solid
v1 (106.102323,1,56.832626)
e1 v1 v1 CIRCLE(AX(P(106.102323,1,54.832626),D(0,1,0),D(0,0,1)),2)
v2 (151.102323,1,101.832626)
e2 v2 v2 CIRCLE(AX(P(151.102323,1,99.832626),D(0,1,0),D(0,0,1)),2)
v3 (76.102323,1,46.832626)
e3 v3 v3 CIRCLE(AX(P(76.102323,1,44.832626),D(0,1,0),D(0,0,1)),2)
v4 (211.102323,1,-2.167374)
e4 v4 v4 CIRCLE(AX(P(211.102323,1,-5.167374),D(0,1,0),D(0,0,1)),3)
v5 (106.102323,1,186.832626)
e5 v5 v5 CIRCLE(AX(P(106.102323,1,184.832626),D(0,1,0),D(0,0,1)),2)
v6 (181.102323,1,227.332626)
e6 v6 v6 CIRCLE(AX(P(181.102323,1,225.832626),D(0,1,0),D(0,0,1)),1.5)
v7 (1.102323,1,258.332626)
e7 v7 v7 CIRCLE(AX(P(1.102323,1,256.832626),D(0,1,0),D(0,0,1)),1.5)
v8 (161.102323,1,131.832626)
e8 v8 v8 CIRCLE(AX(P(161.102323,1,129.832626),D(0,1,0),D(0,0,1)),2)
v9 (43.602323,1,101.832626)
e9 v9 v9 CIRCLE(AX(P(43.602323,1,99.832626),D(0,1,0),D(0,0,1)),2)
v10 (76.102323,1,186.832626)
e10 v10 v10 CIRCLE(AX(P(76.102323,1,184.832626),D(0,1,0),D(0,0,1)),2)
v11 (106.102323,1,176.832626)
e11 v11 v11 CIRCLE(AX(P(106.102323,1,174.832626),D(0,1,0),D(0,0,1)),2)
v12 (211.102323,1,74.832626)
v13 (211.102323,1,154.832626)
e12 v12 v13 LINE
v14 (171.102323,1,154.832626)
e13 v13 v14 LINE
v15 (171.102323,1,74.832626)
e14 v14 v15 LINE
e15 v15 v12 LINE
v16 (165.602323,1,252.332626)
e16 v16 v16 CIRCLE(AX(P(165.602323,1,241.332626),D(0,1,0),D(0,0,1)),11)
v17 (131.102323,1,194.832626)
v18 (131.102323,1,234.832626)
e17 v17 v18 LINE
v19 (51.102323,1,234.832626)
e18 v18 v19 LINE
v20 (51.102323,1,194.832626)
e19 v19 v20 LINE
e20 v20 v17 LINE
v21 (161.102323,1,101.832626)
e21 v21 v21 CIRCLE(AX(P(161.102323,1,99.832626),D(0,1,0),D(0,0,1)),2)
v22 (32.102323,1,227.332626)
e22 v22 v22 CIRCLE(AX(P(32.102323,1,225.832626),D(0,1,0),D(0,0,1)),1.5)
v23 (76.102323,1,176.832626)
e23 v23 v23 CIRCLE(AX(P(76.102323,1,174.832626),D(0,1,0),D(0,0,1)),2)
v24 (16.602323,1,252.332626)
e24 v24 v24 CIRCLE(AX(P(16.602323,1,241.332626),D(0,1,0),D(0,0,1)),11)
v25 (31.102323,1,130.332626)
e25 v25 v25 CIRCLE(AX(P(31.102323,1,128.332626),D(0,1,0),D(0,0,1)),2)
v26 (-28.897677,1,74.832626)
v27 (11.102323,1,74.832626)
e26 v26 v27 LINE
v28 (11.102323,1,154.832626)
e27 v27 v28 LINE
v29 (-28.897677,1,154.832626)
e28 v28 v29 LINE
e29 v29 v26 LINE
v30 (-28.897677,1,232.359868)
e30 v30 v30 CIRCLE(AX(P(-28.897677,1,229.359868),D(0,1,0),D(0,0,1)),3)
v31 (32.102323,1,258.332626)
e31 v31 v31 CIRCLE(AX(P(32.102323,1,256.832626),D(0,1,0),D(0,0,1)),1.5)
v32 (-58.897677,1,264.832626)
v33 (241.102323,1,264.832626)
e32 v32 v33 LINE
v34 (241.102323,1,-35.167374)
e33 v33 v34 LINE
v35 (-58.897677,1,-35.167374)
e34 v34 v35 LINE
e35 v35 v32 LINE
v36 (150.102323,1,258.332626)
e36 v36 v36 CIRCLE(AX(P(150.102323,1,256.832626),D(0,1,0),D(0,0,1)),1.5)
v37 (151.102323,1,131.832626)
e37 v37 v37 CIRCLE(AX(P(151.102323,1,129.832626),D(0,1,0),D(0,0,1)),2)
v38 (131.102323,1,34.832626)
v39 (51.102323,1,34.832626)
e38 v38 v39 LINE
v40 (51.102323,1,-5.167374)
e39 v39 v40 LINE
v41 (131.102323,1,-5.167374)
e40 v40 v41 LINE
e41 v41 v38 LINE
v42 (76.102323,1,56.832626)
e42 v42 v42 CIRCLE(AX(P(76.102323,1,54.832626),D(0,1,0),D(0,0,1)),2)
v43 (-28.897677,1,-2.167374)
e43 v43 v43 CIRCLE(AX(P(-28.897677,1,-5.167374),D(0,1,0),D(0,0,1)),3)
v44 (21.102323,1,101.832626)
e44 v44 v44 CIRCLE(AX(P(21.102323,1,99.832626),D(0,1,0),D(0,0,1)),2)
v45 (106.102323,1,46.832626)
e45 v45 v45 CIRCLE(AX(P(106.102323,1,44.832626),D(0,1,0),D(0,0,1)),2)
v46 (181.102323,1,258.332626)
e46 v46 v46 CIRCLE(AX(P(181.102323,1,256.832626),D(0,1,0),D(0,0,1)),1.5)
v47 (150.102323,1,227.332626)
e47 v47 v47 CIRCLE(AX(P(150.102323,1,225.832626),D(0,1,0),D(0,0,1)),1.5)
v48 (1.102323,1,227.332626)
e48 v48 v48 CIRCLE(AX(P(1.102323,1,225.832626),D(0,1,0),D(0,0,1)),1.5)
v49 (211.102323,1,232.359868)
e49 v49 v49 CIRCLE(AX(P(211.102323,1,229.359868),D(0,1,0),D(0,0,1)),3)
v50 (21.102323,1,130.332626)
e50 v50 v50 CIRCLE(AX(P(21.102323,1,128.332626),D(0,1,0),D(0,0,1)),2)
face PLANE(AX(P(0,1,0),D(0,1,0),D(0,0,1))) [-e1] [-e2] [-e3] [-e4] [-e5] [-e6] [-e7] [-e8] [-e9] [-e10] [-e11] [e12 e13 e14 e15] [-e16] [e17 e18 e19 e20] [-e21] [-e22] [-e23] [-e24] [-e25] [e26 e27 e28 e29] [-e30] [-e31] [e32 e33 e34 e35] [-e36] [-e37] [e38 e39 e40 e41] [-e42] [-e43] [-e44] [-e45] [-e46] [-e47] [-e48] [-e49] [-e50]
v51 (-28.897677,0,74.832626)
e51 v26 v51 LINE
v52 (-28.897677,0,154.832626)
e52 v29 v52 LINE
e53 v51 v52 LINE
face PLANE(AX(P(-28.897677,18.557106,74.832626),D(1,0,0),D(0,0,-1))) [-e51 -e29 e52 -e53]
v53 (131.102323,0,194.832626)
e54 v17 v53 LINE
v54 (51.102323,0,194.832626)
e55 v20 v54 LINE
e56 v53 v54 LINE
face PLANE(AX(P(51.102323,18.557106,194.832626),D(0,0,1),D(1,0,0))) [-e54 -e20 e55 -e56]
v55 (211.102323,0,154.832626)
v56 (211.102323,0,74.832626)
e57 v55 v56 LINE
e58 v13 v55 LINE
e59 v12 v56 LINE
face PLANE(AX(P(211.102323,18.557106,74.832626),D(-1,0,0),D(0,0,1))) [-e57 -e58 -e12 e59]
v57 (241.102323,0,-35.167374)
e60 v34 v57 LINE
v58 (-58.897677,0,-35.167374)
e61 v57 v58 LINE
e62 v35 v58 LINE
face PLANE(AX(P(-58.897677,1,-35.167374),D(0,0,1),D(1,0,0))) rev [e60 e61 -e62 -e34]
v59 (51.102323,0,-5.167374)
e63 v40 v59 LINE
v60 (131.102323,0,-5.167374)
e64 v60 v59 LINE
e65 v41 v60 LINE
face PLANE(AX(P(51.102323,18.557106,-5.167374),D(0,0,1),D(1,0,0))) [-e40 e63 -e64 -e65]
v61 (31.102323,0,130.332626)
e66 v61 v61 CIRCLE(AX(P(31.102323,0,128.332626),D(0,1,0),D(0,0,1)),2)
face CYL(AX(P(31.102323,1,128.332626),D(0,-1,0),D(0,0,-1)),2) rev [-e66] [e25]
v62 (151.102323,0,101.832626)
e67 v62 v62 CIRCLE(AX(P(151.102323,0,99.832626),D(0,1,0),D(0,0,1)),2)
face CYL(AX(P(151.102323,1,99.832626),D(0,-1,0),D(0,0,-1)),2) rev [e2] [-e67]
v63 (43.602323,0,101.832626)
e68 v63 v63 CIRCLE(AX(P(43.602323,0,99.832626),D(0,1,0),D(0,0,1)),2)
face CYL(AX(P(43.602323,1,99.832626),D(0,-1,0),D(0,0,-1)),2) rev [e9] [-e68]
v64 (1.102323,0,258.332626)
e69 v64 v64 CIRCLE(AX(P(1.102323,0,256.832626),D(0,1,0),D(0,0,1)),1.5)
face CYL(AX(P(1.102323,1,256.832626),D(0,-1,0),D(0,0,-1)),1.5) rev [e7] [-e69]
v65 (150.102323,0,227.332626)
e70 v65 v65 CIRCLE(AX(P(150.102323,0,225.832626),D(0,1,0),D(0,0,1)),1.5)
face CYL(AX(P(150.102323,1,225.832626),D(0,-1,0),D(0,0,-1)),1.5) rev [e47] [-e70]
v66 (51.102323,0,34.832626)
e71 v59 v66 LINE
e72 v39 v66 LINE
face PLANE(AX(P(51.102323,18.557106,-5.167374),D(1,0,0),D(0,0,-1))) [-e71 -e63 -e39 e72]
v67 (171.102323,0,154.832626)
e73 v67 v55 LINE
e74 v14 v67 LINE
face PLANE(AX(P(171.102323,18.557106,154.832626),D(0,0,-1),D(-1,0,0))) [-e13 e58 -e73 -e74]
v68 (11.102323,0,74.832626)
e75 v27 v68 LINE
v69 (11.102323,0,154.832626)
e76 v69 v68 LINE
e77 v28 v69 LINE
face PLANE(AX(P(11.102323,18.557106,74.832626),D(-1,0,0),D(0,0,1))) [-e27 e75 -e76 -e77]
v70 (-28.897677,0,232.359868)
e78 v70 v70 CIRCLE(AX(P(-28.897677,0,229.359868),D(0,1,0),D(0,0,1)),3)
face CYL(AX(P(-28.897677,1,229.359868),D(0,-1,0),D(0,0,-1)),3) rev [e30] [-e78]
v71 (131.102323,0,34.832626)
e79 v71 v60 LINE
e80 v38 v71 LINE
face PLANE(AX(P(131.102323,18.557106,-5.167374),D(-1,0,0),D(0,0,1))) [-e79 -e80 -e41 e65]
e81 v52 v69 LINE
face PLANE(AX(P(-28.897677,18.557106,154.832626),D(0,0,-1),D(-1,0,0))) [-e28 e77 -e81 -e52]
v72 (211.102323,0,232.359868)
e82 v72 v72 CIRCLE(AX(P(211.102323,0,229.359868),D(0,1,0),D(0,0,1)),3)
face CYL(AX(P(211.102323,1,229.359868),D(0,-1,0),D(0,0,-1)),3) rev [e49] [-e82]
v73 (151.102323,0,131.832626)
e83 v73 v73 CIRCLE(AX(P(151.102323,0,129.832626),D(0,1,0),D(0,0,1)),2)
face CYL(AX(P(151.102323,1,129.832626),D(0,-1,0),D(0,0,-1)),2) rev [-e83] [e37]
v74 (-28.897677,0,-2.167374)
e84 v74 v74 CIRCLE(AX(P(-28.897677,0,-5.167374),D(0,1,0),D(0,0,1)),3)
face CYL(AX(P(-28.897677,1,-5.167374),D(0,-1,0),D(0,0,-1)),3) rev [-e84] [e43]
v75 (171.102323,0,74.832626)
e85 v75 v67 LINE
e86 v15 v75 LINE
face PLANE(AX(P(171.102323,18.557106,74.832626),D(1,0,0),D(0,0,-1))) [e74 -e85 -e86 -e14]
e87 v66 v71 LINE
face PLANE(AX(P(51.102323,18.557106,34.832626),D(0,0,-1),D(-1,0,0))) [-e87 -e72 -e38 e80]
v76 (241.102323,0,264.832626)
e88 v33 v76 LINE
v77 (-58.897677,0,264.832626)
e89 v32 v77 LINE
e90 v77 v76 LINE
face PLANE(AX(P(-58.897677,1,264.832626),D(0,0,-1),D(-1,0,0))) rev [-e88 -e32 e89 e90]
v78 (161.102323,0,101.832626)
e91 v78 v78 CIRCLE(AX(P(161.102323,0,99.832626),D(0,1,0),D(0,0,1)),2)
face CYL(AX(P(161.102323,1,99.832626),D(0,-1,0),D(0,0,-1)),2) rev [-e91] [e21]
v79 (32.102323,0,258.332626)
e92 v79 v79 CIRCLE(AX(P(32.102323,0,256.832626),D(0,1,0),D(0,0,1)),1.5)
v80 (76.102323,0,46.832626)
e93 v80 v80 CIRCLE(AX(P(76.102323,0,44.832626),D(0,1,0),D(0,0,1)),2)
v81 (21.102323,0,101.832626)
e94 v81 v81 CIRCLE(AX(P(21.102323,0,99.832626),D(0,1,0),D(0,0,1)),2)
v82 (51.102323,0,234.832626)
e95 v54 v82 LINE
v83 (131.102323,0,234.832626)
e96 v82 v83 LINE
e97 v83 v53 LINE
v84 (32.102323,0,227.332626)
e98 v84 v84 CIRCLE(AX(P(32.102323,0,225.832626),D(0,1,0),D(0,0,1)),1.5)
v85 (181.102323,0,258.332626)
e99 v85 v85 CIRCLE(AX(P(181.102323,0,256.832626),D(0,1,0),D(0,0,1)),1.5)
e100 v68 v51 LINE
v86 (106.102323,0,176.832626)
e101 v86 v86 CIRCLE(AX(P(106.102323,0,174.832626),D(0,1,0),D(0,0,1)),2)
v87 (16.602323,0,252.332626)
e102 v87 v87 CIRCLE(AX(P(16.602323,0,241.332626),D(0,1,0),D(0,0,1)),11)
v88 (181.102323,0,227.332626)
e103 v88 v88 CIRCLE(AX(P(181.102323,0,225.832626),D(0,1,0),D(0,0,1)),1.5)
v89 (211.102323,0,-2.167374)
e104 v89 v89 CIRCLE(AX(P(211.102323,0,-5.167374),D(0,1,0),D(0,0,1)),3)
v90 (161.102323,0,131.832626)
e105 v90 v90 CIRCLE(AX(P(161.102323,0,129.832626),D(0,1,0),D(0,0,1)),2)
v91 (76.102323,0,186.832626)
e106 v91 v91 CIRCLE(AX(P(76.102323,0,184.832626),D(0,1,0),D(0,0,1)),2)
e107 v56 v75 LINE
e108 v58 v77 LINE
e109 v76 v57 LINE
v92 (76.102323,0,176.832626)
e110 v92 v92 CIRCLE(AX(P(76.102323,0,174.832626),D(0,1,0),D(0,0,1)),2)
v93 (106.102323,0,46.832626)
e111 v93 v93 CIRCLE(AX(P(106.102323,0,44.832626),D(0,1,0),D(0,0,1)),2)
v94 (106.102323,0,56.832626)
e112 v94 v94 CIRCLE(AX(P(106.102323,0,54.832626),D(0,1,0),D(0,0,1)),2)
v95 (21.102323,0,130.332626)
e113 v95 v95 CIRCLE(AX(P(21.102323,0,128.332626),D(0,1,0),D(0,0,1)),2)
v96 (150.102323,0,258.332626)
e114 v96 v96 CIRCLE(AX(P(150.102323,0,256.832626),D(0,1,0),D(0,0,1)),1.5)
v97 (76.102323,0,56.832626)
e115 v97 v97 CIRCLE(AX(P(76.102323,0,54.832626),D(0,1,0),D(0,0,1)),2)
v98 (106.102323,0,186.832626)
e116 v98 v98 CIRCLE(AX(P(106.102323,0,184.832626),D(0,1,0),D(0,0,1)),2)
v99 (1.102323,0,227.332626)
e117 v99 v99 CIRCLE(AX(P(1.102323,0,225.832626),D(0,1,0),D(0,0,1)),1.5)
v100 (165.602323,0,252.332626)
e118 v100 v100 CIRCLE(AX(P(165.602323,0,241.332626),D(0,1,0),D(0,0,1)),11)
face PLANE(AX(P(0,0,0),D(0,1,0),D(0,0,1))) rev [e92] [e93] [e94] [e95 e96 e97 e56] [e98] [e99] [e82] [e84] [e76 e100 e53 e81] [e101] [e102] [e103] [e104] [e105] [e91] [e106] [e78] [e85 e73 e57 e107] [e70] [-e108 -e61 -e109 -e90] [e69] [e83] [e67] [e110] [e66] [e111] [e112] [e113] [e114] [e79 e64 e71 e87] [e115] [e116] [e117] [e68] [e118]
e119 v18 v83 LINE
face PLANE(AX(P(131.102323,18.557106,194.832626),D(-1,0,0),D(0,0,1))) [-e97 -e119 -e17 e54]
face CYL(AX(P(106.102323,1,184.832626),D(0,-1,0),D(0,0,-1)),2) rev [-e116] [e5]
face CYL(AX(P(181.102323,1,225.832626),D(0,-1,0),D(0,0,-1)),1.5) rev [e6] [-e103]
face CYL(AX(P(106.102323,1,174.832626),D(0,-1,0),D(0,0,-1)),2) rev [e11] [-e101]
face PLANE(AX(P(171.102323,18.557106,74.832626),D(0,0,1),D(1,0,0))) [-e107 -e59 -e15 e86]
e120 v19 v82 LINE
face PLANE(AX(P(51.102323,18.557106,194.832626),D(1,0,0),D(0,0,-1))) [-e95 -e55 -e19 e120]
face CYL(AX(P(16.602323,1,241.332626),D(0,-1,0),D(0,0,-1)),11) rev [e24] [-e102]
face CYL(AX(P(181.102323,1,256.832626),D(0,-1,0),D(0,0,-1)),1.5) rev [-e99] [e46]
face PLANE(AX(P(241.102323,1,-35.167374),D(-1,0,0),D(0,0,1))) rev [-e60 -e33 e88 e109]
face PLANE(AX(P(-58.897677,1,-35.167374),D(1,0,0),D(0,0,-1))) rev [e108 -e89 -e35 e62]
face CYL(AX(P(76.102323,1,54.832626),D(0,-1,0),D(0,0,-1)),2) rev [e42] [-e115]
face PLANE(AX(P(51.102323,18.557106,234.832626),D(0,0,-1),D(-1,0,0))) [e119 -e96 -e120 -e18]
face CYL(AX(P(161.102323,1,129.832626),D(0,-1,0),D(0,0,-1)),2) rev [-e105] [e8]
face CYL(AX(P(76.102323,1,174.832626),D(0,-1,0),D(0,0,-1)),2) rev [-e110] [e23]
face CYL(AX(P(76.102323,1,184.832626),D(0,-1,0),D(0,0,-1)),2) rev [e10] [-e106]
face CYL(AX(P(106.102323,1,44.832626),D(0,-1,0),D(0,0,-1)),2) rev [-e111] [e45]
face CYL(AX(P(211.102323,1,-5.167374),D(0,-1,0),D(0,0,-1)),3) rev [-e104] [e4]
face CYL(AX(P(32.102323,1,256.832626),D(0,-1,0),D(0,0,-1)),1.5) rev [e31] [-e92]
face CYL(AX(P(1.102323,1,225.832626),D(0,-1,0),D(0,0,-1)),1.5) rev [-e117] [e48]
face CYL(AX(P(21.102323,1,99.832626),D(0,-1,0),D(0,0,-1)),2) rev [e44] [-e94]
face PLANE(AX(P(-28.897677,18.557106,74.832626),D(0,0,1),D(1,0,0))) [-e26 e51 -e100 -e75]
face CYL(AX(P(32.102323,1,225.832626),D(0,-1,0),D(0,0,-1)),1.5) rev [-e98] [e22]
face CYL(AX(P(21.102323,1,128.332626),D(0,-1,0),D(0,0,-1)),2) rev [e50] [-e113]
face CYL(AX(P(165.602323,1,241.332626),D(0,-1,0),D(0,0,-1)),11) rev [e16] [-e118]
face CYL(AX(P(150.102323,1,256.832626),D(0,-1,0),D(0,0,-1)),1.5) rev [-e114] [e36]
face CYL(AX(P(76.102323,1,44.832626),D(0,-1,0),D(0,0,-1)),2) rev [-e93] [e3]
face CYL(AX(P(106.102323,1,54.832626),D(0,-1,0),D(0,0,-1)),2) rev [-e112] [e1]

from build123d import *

# Parameters (mm, degrees)
SKETCH_1_W            = 300
SKETCH_1_H            = 300
EXTRUDE_1_DEPTH       = 1
EXTRUDE_2_OUTLINE_W   = 80
EXTRUDE_2_OUTLINE_H   = 40
EXTRUDE_2_OUTLINE_W_2 = 40
EXTRUDE_2_OUTLINE_H_2 = 80
EXTRUDE_2_DEPTH       = 1
SKETCH_3_R            = 3
CUT_EXTRUDE_6_DEPTH   = 359.144733033
SKETCH_4_R            = 2
CUT_EXTRUDE_7_DEPTH   = 359.144733033
SKETCH_5_R            = 1.5
SKETCH_5_R_2          = 11
CUT_EXTRUDE_8_DEPTH   = 359.144733033


# Read off the part's stored shape, not the designer's step: 凸台-拉伸2
with BuildPart() as part:
    # 草图1 → 凸台-拉伸1 (new body)
    with BuildSketch(Plane(origin=(0, 0, 0), x_dir=(1, 0, 0), z_dir=(0, 1, 0))):
        with Locations((91.102323194, -114.832625539)):
            Rectangle(SKETCH_1_W, SKETCH_1_H)
    extrude(amount=EXTRUDE_1_DEPTH)

    # 凸台-拉伸2 outline → 凸台-拉伸2 (cut)
    with BuildSketch(Plane(origin=(0, 0, 0), x_dir=(1, 0, 0), z_dir=(0, 1, 0))):
        with Locations((91.102323194, -14.832625539)):
            Rectangle(EXTRUDE_2_OUTLINE_W, EXTRUDE_2_OUTLINE_H)
        with Locations((91.102323194, -214.832625539)):
            Rectangle(EXTRUDE_2_OUTLINE_W, EXTRUDE_2_OUTLINE_H)
        with Locations((-8.897676806, -114.832625539)):
            Rectangle(EXTRUDE_2_OUTLINE_W_2, EXTRUDE_2_OUTLINE_H_2)
        with Locations((191.102323194, -114.832625539)):
            Rectangle(EXTRUDE_2_OUTLINE_W_2, EXTRUDE_2_OUTLINE_H_2)
    extrude(amount=EXTRUDE_2_DEPTH, mode=Mode.SUBTRACT)

    # 草图3 → 切除-拉伸6 (cut, through all)
    with BuildSketch(Plane(origin=(0, 0, 0), x_dir=(1, 0, 0), z_dir=(0, 1, 0))):
        with Locations(Location((-28.897676806, 5.167374461, 0), (0, 0, 270))):
            Circle(SKETCH_3_R)
        with Locations(Location((211.102323194, 5.167374461, 0), (0, 0, 270))):
            Circle(SKETCH_3_R)
        with Locations(Location((211.102323194, -229.359868174, 0), (0, 0, 270))):
            Circle(SKETCH_3_R)
        with Locations(Location((-28.897676806, -229.359868174, 0), (0, 0, 270))):
            Circle(SKETCH_3_R)
    extrude(amount=CUT_EXTRUDE_6_DEPTH, mode=Mode.SUBTRACT)

    # 草图4 → 切除-拉伸7 (cut, through all)
    with BuildSketch(Plane(origin=(0, 0, 0), x_dir=(1, 0, 0), z_dir=(0, 1, 0))):
        with Locations(Location((76.102323194, -184.832625539, 0), (0, 0, 270))):
            Circle(SKETCH_4_R)
        with Locations(Location((106.102323194, -184.832625539, 0), (0, 0, 270))):
            Circle(SKETCH_4_R)
        with Locations(Location((106.102323194, -174.832625539, 0), (0, 0, 270))):
            Circle(SKETCH_4_R)
        with Locations(Location((76.102323194, -174.832625539, 0), (0, 0, 270))):
            Circle(SKETCH_4_R)
        with Locations(Location((21.102323194, -99.832625539, 0), (0, 0, 270))):
            Circle(SKETCH_4_R)
        with Locations(Location((43.602323194, -99.832625539, 0), (0, 0, 270))):
            Circle(SKETCH_4_R)
        with Locations(Location((31.102323194, -128.332625539, 0), (0, 0, 270))):
            Circle(SKETCH_4_R)
        with Locations(Location((21.102323194, -128.332625539, 0), (0, 0, 270))):
            Circle(SKETCH_4_R)
        with Locations(Location((161.102323194, -99.832625539, 0), (0, 0, 270))):
            Circle(SKETCH_4_R)
        with Locations(Location((151.102323194, -99.832625539, 0), (0, 0, 270))):
            Circle(SKETCH_4_R)
        with Locations(Location((161.102323194, -129.832625539, 0), (0, 0, 270))):
            Circle(SKETCH_4_R)
        with Locations(Location((151.102323194, -129.832625539, 0), (0, 0, 270))):
            Circle(SKETCH_4_R)
        with Locations(Location((76.102323194, -44.832625539, 0), (0, 0, 270))):
            Circle(SKETCH_4_R)
        with Locations(Location((76.102323194, -54.832625539, 0), (0, 0, 270))):
            Circle(SKETCH_4_R)
        with Locations(Location((106.102323194, -54.832625539, 0), (0, 0, 270))):
            Circle(SKETCH_4_R)
        with Locations(Location((106.102323194, -44.832625539, 0), (0, 0, 270))):
            Circle(SKETCH_4_R)
    extrude(amount=CUT_EXTRUDE_7_DEPTH, mode=Mode.SUBTRACT)

    # 草图5 → 切除-拉伸8 (cut, through all)
    with BuildSketch(Plane(origin=(0, 0, 0), x_dir=(1, 0, 0), z_dir=(0, 1, 0))):
        with Locations(Location((150.102323194, -256.832625539, 0), (0, 0, 270))):
            Circle(SKETCH_5_R)
        with Locations(Location((181.102323194, -256.832625539, 0), (0, 0, 270))):
            Circle(SKETCH_5_R)
        with Locations(Location((150.102323194, -225.832625539, 0), (0, 0, 270))):
            Circle(SKETCH_5_R)
        with Locations(Location((181.102323194, -225.832625539, 0), (0, 0, 270))):
            Circle(SKETCH_5_R)
        with Locations(Location((1.102323194, -225.832625539, 0), (0, 0, 270))):
            Circle(SKETCH_5_R)
        with Locations(Location((32.102323194, -225.832625539, 0), (0, 0, 270))):
            Circle(SKETCH_5_R)
        with Locations(Location((32.102323194, -256.832625539, 0), (0, 0, 270))):
            Circle(SKETCH_5_R)
        with Locations(Location((1.102323194, -256.832625539, 0), (0, 0, 270))):
            Circle(SKETCH_5_R)
        with Locations(Location((16.602323194, -241.332625539, 0), (0, 0, 270))):
            Circle(SKETCH_5_R_2)
        with Locations(Location((165.602323194, -241.332625539, 0), (0, 0, 270))):
            Circle(SKETCH_5_R_2)
    extrude(amount=CUT_EXTRUDE_8_DEPTH, mode=Mode.SUBTRACT)


solid = part.part
